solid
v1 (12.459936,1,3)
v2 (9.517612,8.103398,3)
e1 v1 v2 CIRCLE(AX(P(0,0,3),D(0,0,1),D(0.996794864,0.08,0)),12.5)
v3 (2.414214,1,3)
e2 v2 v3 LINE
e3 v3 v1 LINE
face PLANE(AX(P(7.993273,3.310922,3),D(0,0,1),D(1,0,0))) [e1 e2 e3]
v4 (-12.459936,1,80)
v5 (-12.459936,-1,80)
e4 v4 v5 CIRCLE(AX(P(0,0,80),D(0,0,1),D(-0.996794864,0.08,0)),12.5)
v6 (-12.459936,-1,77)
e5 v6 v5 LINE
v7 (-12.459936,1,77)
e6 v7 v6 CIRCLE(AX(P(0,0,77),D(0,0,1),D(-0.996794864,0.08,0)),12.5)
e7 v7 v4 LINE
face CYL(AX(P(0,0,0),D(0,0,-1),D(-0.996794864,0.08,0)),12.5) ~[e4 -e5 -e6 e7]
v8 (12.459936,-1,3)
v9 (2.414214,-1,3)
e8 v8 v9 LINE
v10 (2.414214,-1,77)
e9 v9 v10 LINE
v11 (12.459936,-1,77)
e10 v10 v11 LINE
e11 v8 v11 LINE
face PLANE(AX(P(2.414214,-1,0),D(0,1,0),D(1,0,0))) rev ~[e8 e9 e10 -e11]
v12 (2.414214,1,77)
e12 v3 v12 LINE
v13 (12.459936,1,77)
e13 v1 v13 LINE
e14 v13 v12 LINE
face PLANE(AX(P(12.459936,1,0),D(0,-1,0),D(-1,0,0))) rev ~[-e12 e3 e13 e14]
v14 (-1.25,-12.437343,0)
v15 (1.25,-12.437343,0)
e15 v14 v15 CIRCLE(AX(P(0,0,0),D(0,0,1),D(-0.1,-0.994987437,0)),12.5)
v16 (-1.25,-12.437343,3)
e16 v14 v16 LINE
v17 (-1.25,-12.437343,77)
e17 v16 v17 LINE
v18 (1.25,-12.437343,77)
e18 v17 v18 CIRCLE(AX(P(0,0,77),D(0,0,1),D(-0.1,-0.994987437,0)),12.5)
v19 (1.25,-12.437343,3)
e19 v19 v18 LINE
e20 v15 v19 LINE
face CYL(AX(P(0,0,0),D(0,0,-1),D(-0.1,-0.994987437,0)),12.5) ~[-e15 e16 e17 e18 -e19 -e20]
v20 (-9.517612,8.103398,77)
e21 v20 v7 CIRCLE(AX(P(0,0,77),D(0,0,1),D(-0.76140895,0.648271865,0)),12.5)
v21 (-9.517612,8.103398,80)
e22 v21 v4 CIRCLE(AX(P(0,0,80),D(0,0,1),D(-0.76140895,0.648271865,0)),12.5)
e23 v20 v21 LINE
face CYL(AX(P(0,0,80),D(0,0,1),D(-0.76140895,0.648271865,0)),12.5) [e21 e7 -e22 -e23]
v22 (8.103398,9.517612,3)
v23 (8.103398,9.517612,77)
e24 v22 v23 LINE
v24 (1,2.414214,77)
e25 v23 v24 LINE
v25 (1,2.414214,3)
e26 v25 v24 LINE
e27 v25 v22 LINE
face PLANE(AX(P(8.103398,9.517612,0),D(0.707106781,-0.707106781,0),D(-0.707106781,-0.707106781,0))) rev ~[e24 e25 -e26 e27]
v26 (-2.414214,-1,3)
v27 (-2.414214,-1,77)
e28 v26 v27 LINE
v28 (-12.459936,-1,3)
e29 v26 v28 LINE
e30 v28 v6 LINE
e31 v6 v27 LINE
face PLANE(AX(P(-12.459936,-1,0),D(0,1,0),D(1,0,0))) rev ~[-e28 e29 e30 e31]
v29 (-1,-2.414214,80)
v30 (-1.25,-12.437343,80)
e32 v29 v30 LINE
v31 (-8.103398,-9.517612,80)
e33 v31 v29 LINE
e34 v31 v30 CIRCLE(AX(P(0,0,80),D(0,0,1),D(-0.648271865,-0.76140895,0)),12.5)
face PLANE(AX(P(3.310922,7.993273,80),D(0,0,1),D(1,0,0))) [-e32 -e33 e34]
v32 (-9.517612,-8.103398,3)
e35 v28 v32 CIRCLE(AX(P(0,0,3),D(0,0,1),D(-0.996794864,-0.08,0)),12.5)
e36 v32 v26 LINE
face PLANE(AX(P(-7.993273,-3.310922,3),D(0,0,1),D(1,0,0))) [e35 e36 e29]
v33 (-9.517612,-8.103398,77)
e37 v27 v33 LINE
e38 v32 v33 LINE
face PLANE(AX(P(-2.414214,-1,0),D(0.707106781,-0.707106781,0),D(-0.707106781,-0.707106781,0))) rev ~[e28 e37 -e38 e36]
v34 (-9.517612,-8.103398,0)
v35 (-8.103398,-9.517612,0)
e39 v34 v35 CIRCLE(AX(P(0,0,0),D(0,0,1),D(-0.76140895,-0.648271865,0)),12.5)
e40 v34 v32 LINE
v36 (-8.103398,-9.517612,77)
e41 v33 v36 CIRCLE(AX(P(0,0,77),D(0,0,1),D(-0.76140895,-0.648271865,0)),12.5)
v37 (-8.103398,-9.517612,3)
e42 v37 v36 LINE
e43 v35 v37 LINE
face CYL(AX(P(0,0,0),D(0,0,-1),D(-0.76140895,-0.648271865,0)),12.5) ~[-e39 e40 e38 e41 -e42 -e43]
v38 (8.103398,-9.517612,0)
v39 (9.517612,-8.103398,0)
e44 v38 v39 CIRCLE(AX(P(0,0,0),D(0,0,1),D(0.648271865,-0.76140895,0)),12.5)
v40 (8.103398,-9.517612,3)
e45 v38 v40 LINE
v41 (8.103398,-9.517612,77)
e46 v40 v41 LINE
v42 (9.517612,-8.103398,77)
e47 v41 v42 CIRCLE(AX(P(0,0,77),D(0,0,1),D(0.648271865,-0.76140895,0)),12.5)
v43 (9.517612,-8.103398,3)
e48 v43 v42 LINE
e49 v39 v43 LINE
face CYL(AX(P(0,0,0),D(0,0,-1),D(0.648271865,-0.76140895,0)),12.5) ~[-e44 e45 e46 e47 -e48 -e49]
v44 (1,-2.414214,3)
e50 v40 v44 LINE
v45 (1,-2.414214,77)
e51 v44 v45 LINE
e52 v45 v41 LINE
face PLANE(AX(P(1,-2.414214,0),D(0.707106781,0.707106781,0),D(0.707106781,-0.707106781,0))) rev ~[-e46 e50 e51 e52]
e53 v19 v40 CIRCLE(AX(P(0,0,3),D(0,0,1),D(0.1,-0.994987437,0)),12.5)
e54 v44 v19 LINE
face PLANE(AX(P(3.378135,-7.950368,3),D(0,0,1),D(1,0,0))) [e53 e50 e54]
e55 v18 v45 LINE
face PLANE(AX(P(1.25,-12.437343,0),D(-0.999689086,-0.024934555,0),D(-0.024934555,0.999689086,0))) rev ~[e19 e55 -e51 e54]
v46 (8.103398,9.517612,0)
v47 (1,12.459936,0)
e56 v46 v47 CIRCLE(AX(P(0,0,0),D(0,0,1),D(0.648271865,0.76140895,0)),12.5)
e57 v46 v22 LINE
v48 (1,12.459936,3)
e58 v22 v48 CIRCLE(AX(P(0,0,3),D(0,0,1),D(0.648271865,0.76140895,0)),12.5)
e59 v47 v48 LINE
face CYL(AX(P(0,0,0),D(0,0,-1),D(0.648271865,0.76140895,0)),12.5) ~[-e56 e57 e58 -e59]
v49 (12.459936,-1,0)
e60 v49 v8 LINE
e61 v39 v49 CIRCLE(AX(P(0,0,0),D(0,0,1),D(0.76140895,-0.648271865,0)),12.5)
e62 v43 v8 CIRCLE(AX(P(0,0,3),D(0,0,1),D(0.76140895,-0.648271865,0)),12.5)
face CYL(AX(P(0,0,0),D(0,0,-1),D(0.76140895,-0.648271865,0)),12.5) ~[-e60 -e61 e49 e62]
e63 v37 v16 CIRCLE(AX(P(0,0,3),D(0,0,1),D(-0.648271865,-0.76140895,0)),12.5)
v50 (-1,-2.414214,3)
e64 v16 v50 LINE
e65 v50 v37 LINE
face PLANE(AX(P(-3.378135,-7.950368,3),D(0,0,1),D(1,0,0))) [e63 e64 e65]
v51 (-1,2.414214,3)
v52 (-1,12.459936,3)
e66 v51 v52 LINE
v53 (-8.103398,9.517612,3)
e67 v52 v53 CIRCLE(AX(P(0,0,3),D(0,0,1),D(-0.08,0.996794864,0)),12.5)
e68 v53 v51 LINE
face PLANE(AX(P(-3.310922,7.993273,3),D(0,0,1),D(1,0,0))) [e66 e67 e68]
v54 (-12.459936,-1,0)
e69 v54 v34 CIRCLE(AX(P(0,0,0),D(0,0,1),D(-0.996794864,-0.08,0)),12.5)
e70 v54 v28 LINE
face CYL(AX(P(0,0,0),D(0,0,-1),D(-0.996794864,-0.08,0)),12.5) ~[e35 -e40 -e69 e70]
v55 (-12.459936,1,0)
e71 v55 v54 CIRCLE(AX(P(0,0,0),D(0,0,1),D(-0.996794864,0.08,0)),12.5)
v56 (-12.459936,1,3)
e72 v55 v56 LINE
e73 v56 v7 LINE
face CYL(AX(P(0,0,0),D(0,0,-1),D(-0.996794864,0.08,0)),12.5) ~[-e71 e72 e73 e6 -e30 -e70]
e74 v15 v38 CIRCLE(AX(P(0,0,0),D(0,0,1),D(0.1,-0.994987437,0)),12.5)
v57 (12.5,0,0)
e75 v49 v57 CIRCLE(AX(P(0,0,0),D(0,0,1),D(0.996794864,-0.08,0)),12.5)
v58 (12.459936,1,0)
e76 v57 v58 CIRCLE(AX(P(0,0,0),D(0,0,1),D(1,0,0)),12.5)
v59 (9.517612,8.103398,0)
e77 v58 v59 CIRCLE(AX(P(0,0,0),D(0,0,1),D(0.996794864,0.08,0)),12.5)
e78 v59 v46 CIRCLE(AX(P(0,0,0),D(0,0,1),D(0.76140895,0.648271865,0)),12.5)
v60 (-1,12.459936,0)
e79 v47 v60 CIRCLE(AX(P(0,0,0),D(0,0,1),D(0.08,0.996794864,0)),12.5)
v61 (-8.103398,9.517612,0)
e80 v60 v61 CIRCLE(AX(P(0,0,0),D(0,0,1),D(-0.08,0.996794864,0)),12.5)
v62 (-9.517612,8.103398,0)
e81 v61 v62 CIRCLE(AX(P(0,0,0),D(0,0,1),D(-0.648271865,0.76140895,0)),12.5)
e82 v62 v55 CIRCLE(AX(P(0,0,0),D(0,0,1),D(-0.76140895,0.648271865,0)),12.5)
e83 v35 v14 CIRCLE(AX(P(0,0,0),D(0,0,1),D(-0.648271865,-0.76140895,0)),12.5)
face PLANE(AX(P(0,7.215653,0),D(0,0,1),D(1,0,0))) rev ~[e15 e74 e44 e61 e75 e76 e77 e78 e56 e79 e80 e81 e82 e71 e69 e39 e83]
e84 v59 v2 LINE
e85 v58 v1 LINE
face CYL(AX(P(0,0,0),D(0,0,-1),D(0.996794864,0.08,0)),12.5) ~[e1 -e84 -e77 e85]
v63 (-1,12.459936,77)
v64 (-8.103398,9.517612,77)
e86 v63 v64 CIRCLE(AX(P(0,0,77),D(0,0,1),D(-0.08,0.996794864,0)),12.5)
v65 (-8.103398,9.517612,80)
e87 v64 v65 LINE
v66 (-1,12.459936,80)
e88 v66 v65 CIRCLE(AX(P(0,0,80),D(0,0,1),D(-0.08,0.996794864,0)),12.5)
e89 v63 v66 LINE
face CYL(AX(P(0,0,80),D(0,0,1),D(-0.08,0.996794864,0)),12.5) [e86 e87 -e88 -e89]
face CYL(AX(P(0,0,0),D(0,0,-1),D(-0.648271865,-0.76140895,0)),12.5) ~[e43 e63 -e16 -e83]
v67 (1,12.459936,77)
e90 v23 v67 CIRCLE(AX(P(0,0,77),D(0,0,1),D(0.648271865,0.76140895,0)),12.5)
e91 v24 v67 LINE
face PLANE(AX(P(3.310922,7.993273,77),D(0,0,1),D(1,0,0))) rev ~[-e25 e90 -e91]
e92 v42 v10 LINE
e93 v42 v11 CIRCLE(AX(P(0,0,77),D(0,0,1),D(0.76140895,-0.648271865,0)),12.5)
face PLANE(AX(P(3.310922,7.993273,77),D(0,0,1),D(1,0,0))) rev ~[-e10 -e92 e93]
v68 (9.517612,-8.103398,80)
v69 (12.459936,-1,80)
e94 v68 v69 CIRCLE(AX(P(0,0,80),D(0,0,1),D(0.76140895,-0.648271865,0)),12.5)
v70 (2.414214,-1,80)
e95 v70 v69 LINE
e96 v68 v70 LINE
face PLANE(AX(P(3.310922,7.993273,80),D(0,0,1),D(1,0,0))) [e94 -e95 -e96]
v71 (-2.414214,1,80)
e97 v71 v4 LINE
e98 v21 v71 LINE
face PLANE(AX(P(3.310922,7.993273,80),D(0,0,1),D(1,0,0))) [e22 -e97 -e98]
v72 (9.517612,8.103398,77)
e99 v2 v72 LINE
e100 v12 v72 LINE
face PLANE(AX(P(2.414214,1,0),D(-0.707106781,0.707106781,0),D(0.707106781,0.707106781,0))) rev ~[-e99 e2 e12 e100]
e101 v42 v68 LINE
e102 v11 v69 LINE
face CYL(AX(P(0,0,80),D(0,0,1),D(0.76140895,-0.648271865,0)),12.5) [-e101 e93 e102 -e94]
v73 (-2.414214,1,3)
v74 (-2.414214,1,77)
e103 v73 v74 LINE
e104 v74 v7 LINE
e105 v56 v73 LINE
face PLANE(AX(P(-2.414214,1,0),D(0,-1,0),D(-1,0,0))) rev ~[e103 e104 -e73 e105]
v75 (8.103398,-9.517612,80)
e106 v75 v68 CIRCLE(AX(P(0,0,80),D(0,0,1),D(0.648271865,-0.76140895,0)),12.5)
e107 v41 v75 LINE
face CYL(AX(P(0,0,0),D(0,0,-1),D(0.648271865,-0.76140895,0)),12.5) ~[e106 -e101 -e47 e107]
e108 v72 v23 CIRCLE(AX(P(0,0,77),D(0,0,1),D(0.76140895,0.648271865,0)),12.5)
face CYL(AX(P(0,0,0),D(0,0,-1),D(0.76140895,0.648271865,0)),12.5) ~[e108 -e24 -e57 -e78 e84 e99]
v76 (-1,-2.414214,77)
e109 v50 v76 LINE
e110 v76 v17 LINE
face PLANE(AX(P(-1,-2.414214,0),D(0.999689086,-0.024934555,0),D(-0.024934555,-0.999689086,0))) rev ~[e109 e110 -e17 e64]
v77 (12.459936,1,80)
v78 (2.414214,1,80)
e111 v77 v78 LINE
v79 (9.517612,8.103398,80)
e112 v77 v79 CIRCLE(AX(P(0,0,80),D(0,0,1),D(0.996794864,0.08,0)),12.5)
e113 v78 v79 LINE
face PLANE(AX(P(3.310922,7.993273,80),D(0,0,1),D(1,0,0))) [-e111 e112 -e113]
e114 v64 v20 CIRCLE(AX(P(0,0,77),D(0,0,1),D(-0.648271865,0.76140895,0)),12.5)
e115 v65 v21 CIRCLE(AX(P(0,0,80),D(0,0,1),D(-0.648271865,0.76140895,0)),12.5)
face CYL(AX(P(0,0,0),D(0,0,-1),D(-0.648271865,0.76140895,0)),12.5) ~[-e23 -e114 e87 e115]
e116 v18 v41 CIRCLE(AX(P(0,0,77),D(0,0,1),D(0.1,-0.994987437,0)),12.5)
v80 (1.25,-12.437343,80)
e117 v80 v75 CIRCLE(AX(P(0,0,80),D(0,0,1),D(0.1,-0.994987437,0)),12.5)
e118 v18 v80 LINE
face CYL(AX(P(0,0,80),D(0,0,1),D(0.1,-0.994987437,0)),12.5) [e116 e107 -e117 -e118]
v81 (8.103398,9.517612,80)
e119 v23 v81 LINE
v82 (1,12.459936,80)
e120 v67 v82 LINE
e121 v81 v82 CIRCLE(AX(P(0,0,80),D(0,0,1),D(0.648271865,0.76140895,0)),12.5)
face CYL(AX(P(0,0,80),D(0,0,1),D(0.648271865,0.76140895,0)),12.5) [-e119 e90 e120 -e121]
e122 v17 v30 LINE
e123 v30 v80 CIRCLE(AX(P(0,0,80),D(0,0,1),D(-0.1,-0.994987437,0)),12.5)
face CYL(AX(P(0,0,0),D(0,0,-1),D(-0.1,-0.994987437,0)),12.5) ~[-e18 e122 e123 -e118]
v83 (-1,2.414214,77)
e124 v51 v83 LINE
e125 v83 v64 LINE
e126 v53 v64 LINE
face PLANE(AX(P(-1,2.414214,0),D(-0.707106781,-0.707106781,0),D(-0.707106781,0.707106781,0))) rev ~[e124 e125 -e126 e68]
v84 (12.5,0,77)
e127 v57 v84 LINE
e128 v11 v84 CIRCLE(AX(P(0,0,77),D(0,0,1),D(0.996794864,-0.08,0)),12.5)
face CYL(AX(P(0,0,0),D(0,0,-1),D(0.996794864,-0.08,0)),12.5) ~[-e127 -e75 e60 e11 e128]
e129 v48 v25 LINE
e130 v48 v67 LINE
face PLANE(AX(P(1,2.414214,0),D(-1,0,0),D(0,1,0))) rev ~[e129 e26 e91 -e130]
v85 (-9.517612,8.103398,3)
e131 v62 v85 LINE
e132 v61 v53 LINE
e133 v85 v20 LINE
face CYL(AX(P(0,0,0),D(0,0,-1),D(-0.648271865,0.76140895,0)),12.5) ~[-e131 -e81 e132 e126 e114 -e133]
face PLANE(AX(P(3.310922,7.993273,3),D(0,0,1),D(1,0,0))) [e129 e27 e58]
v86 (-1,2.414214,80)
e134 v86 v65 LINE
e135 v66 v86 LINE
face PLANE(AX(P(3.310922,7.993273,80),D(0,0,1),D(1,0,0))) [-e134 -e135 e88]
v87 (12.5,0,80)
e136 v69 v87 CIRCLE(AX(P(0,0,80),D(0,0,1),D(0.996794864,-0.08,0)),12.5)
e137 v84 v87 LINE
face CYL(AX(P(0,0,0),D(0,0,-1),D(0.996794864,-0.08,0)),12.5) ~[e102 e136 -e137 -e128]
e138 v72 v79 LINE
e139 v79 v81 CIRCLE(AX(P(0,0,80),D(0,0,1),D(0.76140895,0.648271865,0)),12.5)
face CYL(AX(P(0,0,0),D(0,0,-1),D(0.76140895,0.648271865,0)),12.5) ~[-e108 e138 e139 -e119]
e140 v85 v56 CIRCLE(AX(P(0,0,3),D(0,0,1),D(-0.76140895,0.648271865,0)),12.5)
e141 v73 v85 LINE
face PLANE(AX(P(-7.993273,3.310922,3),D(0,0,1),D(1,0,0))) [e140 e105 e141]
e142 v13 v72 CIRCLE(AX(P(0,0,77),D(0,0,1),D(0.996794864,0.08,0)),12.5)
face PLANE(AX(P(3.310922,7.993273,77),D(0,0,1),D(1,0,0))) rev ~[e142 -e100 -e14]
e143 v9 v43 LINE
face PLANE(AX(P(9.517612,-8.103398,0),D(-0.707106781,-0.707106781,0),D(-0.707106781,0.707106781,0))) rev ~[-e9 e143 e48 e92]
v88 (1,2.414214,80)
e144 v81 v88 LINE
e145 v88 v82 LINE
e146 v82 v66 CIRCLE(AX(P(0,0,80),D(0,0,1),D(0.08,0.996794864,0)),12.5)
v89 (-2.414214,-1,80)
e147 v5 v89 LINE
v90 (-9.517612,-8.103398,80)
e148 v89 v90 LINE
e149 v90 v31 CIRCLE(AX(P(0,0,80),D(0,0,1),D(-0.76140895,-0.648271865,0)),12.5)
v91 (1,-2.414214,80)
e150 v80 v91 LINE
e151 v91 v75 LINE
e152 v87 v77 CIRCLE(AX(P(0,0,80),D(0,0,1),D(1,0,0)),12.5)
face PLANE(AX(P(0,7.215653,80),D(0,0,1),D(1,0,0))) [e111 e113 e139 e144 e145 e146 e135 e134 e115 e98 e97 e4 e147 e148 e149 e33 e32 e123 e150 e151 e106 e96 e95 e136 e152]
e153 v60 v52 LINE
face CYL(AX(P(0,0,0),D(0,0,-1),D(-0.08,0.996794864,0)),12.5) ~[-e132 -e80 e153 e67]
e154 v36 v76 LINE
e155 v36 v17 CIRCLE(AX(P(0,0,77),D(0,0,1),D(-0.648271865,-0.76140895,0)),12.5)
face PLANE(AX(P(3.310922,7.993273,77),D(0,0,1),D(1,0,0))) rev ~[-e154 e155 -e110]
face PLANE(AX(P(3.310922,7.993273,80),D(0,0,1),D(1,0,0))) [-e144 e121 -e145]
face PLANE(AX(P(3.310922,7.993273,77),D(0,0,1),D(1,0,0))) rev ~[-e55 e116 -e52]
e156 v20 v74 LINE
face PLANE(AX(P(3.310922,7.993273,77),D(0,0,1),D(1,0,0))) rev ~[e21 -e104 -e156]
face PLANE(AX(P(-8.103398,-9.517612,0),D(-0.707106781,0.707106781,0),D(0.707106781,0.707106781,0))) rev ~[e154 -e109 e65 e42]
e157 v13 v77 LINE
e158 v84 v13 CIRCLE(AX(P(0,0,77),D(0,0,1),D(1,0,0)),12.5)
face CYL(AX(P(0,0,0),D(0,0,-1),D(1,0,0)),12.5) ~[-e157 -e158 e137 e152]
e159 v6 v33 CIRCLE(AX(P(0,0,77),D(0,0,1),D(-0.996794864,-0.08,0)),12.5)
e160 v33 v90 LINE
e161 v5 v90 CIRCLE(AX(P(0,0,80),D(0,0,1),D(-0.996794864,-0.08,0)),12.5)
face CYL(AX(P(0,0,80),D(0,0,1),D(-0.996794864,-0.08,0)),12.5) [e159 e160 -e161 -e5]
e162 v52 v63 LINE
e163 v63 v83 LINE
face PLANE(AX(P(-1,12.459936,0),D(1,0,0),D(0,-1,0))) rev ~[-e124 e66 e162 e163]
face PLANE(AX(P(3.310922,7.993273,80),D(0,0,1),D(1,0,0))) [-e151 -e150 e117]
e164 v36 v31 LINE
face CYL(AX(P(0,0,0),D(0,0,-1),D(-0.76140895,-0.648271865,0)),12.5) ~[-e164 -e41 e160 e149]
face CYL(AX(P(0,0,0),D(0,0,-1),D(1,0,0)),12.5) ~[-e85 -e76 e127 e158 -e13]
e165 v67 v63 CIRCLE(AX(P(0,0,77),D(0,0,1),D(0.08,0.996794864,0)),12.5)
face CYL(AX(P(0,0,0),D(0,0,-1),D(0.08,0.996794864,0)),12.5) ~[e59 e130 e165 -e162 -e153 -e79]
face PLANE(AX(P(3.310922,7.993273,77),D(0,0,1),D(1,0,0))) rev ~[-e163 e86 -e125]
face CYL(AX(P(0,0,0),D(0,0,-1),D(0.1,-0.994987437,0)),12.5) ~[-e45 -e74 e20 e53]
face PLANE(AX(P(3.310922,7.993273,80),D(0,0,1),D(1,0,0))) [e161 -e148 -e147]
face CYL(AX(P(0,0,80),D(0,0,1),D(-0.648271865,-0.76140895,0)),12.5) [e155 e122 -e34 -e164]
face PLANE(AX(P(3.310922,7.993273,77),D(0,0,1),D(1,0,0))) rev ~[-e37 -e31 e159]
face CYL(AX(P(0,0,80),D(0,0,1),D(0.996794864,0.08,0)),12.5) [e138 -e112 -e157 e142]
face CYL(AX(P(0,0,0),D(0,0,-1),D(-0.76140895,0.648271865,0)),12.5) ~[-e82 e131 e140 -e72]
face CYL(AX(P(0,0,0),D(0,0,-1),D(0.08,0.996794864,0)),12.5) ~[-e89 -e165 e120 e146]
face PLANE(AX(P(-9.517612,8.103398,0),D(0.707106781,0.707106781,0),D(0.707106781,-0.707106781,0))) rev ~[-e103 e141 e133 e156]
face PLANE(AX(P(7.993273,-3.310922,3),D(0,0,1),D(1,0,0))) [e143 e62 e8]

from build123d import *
from build123d import SkipClean  # not in build123d's __all__

# Parameters (mm, degrees)
F1_DEPTH = 3
F2_DEPTH = 80
F4_DEPTH = 3


with BuildPart() as f1:
    # F0 (on Top) → F1 (new body)
    with BuildSketch(Plane.XY):
        with BuildLine():
            Line((1, 2.4142135624), (8.1033983122, 9.5176118745))
            ThreePointArc((8.1033983122, 9.5176118745), (4.7835429046, 11.5484941564), (1, 12.4599357944))
            Line((1, 12.4599357944), (1, 2.4142135624))
        make_face()
    extrude(amount=F1_DEPTH)



with BuildPart() as f1b:
    # F0 (on Top) → F1, piece 2 (new body)
    with BuildSketch(Plane.XY):
        with BuildLine():
            Line((-1, 2.4142135624), (-1, 12.4599357944))
            ThreePointArc((-1, 12.4599357944), (-4.7835429046, 11.5484941564), (-8.1033983122, 9.5176118745))
            Line((-8.1033983122, 9.5176118745), (-1, 2.4142135624))
        make_face()
    extrude(amount=F1_DEPTH)


with BuildPart() as f1c:
    # F0 (on Top) → F1, piece 3 (new body)
    with BuildSketch(Plane.XY):
        with BuildLine():
            Line((2.4142135624, 1), (12.4599357944, 1))
            ThreePointArc((12.4599357944, 1), (11.5484941564, 4.7835429046), (9.5176118745, 8.1033983122))
            Line((9.5176118745, 8.1033983122), (2.4142135624, 1))
        make_face()
    extrude(amount=F1_DEPTH)


with BuildPart() as f1d:
    # F0 (on Top) → F1, piece 4 (new body)
    with BuildSketch(Plane.XY):
        with BuildLine():
            ThreePointArc((9.5176118745, -8.1033983122), (11.5484941564, -4.7835429046), (12.4599357944, -1))
            Line((12.4599357944, -1), (2.4142135624, -1))
            Line((2.4142135624, -1), (9.5176118745, -8.1033983122))
        make_face()
    extrude(amount=F1_DEPTH)


with BuildPart() as f1e:
    # F0 (on Top) → F1, piece 5 (new body)
    with BuildSketch(Plane.XY):
        with BuildLine():
            Line((-12.4599357944, 1), (-2.4142135624, 1))
            Line((-2.4142135624, 1), (-9.5176118745, 8.1033983122))
            ThreePointArc((-9.5176118745, 8.1033983122), (-11.5484941564, 4.7835429046), (-12.4599357944, 1))
        make_face()
    extrude(amount=F1_DEPTH)


with BuildPart() as f1f:
    # F0 (on Top) → F1, piece 6 (new body)
    with BuildSketch(Plane.XY):
        with BuildLine():
            ThreePointArc((-12.4599357944, -1), (-11.5484941564, -4.7835429046), (-9.5176118745, -8.1033983122))
            Line((-9.5176118745, -8.1033983122), (-2.4142135624, -1))
            Line((-2.4142135624, -1), (-12.4599357944, -1))
        make_face()
    extrude(amount=F1_DEPTH)


with BuildPart() as f1g:
    # F0 (on Top) → F1, piece 7 (new body)
    with BuildSketch(Plane.XY):
        with BuildLine():
            ThreePointArc((-8.1033983122, -9.5176118745), (-4.899257332, -11.499881634), (-1.25, -12.4373429638))
            Line((-1.25, -12.4373429638), (-1, -2.4142135624))
            Line((-1, -2.4142135624), (-8.1033983122, -9.5176118745))
        make_face()
    extrude(amount=F1_DEPTH)


with BuildPart() as f1h:
    # F0 (on Top) → F1, piece 8 (new body)
    with BuildSketch(Plane.XY):
        with BuildLine():
            ThreePointArc((1.25, -12.4373429638), (4.899257332, -11.499881634), (8.1033983122, -9.5176118745))
            Line((8.1033983122, -9.5176118745), (1, -2.4142135624))
            Line((1, -2.4142135624), (1.25, -12.4373429638))
        make_face()
    extrude(amount=F1_DEPTH)


with BuildPart() as f1_1:
    add(f1.part, clean=False)

    add(f1b.part)  # F2 merges F1b

    add(f1c.part)  # F2 merges F1c

    add(f1d.part)  # F2 merges F1d

    add(f1e.part)  # F2 merges F1e

    add(f1f.part)  # F2 merges F1f

    add(f1g.part)  # F2 merges F1g

    add(f1h.part)  # F2 merges F1h
    # F0 (on Top) → F2 (join)
    with BuildSketch(Plane.XY):
        with BuildLine():
            Line((1, 2.4142135624), (1, 12.4599357944))
            ThreePointArc((1, 12.4599357944), (0, 12.5), (-1, 12.4599357944))
            Line((-1, 12.4599357944), (-1, 2.4142135624))
            Line((-1, 2.4142135624), (0, 1.4142135624))
            Line((0, 1.4142135624), (1, 2.4142135624))
        make_face()
        with BuildLine():
            Line((2.4142135624, 1), (9.5176118745, 8.1033983122))
            ThreePointArc((9.5176118745, 8.1033983122), (8.8388347648, 8.8388347648), (8.1033983122, 9.5176118745))
            Line((8.1033983122, 9.5176118745), (1, 2.4142135624))
            Line((1, 2.4142135624), (0, 1.4142135624))
            Line((0, 1.4142135624), (-1, 2.4142135624))
            Line((-1, 2.4142135624), (-8.1033983122, 9.5176118745))
            ThreePointArc((-8.1033983122, 9.5176118745), (-8.8388347648, 8.8388347648), (-9.5176118745, 8.1033983122))
            Line((-9.5176118745, 8.1033983122), (-2.4142135624, 1))
            Line((-2.4142135624, 1), (0, -1.4142135624))
            Line((0, -1.4142135624), (1, -2.4142135624))
            Line((1, -2.4142135624), (8.1033983122, -9.5176118745))
            ThreePointArc((8.1033983122, -9.5176118745), (8.8388347648, -8.8388347648), (9.5176118745, -8.1033983122))
            Line((9.5176118745, -8.1033983122), (2.4142135624, -1))
            Line((2.4142135624, -1), (1.4142135624, 0))
            Line((1.4142135624, 0), (2.4142135624, 1))
        make_face()
        with BuildLine():
            Line((-1, -2.4142135624), (0, -1.4142135624))
            Line((0, -1.4142135624), (-2.4142135624, 1))
            Line((-2.4142135624, 1), (-12.4599357944, 1))
            ThreePointArc((-12.4599357944, 1), (-12.5, 0), (-12.4599357944, -1))
            Line((-12.4599357944, -1), (-2.4142135624, -1))
            Line((-2.4142135624, -1), (-9.5176118745, -8.1033983122))
            ThreePointArc((-9.5176118745, -8.1033983122), (-8.8388347648, -8.8388347648), (-8.1033983122, -9.5176118745))
            Line((-8.1033983122, -9.5176118745), (-1, -2.4142135624))
        make_face()
        with BuildLine():
            ThreePointArc((12.4599357944, -1), (12.4899799325, -0.5004011242), (12.5, 0))
            ThreePointArc((12.5, 0), (12.4899799325, 0.5004011242), (12.4599357944, 1))
            Line((12.4599357944, 1), (2.4142135624, 1))
            Line((2.4142135624, 1), (1.4142135624, 0))
            Line((1.4142135624, 0), (2.4142135624, -1))
            Line((2.4142135624, -1), (12.4599357944, -1))
        make_face()
        with BuildLine():
            ThreePointArc((-1.25, -12.4373429638), (0, -12.5), (1.25, -12.4373429638))
            Line((1.25, -12.4373429638), (1, -2.4142135624))
            Line((1, -2.4142135624), (0, -1.4142135624))
            Line((0, -1.4142135624), (-1, -2.4142135624))
            Line((-1, -2.4142135624), (-1.25, -12.4373429638))
        make_face()
    extrude(amount=F2_DEPTH)

    # F3 (on face) → F4 (join)
    with BuildSketch(Plane.XY.offset(80)):
        with BuildLine():
            Line((1, 2.4142135624), (8.1033983122, 9.5176118745))
            ThreePointArc((8.1033983122, 9.5176118745), (4.7835429046, 11.5484941564), (1, 12.4599357944))
            Line((1, 12.4599357944), (1, 2.4142135624))
        make_face()
        with BuildLine():
            Line((-1, 2.4142135624), (-1, 12.4599357944))
            ThreePointArc((-1, 12.4599357944), (-4.7835429046, 11.5484941564), (-8.1033983122, 9.5176118745))
            Line((-8.1033983122, 9.5176118745), (-1, 2.4142135624))
        make_face()
        with BuildLine():
            ThreePointArc((12.4599357944, -1), (12.4899799325, -0.5004011242), (12.5, 0))
            ThreePointArc((12.5, 0), (12.4899799325, 0.5004011242), (12.4599357944, 1))
            Line((12.4599357944, 1), (2.4142135624, 1))
            Line((2.4142135624, 1), (9.5176118745, 8.1033983122))
            ThreePointArc((9.5176118745, 8.1033983122), (8.8388347648, 8.8388347648), (8.1033983122, 9.5176118745))
            Line((8.1033983122, 9.5176118745), (1, 2.4142135624))
            Line((1, 2.4142135624), (1, 12.4599357944))
            ThreePointArc((1, 12.4599357944), (0, 12.5), (-1, 12.4599357944))
            Line((-1, 12.4599357944), (-1, 2.4142135624))
            Line((-1, 2.4142135624), (-8.1033983122, 9.5176118745))
            ThreePointArc((-8.1033983122, 9.5176118745), (-8.8388347648, 8.8388347648), (-9.5176118745, 8.1033983122))
            Line((-9.5176118745, 8.1033983122), (-2.4142135624, 1))
            Line((-2.4142135624, 1), (-12.4599357944, 1))
            ThreePointArc((-12.4599357944, 1), (-12.5, 0), (-12.4599357944, -1))
            Line((-12.4599357944, -1), (-2.4142135624, -1))
            Line((-2.4142135624, -1), (-9.5176118745, -8.1033983122))
            ThreePointArc((-9.5176118745, -8.1033983122), (-8.8388347648, -8.8388347648), (-8.1033983122, -9.5176118745))
            Line((-8.1033983122, -9.5176118745), (-1, -2.4142135624))
            Line((-1, -2.4142135624), (-1.25, -12.4373429638))
            ThreePointArc((-1.25, -12.4373429638), (0, -12.5), (1.25, -12.4373429638))
            Line((1.25, -12.4373429638), (1, -2.4142135624))
            Line((1, -2.4142135624), (8.1033983122, -9.5176118745))
            ThreePointArc((8.1033983122, -9.5176118745), (8.8388347648, -8.8388347648), (9.5176118745, -8.1033983122))
            Line((9.5176118745, -8.1033983122), (2.4142135624, -1))
            Line((2.4142135624, -1), (12.4599357944, -1))
        make_face()
        with BuildLine():
            Line((-2.4142135624, 1), (-9.5176118745, 8.1033983122))
            ThreePointArc((-9.5176118745, 8.1033983122), (-11.5484941564, 4.7835429046), (-12.4599357944, 1))
            Line((-12.4599357944, 1), (-2.4142135624, 1))
        make_face()
        with BuildLine():
            ThreePointArc((-12.4599357944, -1), (-11.5484941564, -4.7835429046), (-9.5176118745, -8.1033983122))
            Line((-9.5176118745, -8.1033983122), (-2.4142135624, -1))
            Line((-2.4142135624, -1), (-12.4599357944, -1))
        make_face()
        with BuildLine():
            ThreePointArc((-8.1033983122, -9.5176118745), (-4.899257332, -11.499881634), (-1.25, -12.4373429638))
            Line((-1.25, -12.4373429638), (-1, -2.4142135624))
            Line((-1, -2.4142135624), (-8.1033983122, -9.5176118745))
        make_face()
        with BuildLine():
            ThreePointArc((1.25, -12.4373429638), (4.899257332, -11.499881634), (8.1033983122, -9.5176118745))
            Line((8.1033983122, -9.5176118745), (1, -2.4142135624))
            Line((1, -2.4142135624), (1.25, -12.4373429638))
        make_face()
        with BuildLine():
            ThreePointArc((9.5176118745, -8.1033983122), (11.5484941564, -4.7835429046), (12.4599357944, -1))
            Line((12.4599357944, -1), (2.4142135624, -1))
            Line((2.4142135624, -1), (9.5176118745, -8.1033983122))
        make_face()
        with BuildLine():
            Line((2.4142135624, 1), (12.4599357944, 1))
            ThreePointArc((12.4599357944, 1), (11.5484941564, 4.7835429046), (9.5176118745, 8.1033983122))
            Line((9.5176118745, 8.1033983122), (2.4142135624, 1))
        make_face()
    with SkipClean():  # cleaning this boolean's faces spoils the solid; the shape is the same uncleaned
        extrude(amount=-F4_DEPTH)


solid = f1_1.part
